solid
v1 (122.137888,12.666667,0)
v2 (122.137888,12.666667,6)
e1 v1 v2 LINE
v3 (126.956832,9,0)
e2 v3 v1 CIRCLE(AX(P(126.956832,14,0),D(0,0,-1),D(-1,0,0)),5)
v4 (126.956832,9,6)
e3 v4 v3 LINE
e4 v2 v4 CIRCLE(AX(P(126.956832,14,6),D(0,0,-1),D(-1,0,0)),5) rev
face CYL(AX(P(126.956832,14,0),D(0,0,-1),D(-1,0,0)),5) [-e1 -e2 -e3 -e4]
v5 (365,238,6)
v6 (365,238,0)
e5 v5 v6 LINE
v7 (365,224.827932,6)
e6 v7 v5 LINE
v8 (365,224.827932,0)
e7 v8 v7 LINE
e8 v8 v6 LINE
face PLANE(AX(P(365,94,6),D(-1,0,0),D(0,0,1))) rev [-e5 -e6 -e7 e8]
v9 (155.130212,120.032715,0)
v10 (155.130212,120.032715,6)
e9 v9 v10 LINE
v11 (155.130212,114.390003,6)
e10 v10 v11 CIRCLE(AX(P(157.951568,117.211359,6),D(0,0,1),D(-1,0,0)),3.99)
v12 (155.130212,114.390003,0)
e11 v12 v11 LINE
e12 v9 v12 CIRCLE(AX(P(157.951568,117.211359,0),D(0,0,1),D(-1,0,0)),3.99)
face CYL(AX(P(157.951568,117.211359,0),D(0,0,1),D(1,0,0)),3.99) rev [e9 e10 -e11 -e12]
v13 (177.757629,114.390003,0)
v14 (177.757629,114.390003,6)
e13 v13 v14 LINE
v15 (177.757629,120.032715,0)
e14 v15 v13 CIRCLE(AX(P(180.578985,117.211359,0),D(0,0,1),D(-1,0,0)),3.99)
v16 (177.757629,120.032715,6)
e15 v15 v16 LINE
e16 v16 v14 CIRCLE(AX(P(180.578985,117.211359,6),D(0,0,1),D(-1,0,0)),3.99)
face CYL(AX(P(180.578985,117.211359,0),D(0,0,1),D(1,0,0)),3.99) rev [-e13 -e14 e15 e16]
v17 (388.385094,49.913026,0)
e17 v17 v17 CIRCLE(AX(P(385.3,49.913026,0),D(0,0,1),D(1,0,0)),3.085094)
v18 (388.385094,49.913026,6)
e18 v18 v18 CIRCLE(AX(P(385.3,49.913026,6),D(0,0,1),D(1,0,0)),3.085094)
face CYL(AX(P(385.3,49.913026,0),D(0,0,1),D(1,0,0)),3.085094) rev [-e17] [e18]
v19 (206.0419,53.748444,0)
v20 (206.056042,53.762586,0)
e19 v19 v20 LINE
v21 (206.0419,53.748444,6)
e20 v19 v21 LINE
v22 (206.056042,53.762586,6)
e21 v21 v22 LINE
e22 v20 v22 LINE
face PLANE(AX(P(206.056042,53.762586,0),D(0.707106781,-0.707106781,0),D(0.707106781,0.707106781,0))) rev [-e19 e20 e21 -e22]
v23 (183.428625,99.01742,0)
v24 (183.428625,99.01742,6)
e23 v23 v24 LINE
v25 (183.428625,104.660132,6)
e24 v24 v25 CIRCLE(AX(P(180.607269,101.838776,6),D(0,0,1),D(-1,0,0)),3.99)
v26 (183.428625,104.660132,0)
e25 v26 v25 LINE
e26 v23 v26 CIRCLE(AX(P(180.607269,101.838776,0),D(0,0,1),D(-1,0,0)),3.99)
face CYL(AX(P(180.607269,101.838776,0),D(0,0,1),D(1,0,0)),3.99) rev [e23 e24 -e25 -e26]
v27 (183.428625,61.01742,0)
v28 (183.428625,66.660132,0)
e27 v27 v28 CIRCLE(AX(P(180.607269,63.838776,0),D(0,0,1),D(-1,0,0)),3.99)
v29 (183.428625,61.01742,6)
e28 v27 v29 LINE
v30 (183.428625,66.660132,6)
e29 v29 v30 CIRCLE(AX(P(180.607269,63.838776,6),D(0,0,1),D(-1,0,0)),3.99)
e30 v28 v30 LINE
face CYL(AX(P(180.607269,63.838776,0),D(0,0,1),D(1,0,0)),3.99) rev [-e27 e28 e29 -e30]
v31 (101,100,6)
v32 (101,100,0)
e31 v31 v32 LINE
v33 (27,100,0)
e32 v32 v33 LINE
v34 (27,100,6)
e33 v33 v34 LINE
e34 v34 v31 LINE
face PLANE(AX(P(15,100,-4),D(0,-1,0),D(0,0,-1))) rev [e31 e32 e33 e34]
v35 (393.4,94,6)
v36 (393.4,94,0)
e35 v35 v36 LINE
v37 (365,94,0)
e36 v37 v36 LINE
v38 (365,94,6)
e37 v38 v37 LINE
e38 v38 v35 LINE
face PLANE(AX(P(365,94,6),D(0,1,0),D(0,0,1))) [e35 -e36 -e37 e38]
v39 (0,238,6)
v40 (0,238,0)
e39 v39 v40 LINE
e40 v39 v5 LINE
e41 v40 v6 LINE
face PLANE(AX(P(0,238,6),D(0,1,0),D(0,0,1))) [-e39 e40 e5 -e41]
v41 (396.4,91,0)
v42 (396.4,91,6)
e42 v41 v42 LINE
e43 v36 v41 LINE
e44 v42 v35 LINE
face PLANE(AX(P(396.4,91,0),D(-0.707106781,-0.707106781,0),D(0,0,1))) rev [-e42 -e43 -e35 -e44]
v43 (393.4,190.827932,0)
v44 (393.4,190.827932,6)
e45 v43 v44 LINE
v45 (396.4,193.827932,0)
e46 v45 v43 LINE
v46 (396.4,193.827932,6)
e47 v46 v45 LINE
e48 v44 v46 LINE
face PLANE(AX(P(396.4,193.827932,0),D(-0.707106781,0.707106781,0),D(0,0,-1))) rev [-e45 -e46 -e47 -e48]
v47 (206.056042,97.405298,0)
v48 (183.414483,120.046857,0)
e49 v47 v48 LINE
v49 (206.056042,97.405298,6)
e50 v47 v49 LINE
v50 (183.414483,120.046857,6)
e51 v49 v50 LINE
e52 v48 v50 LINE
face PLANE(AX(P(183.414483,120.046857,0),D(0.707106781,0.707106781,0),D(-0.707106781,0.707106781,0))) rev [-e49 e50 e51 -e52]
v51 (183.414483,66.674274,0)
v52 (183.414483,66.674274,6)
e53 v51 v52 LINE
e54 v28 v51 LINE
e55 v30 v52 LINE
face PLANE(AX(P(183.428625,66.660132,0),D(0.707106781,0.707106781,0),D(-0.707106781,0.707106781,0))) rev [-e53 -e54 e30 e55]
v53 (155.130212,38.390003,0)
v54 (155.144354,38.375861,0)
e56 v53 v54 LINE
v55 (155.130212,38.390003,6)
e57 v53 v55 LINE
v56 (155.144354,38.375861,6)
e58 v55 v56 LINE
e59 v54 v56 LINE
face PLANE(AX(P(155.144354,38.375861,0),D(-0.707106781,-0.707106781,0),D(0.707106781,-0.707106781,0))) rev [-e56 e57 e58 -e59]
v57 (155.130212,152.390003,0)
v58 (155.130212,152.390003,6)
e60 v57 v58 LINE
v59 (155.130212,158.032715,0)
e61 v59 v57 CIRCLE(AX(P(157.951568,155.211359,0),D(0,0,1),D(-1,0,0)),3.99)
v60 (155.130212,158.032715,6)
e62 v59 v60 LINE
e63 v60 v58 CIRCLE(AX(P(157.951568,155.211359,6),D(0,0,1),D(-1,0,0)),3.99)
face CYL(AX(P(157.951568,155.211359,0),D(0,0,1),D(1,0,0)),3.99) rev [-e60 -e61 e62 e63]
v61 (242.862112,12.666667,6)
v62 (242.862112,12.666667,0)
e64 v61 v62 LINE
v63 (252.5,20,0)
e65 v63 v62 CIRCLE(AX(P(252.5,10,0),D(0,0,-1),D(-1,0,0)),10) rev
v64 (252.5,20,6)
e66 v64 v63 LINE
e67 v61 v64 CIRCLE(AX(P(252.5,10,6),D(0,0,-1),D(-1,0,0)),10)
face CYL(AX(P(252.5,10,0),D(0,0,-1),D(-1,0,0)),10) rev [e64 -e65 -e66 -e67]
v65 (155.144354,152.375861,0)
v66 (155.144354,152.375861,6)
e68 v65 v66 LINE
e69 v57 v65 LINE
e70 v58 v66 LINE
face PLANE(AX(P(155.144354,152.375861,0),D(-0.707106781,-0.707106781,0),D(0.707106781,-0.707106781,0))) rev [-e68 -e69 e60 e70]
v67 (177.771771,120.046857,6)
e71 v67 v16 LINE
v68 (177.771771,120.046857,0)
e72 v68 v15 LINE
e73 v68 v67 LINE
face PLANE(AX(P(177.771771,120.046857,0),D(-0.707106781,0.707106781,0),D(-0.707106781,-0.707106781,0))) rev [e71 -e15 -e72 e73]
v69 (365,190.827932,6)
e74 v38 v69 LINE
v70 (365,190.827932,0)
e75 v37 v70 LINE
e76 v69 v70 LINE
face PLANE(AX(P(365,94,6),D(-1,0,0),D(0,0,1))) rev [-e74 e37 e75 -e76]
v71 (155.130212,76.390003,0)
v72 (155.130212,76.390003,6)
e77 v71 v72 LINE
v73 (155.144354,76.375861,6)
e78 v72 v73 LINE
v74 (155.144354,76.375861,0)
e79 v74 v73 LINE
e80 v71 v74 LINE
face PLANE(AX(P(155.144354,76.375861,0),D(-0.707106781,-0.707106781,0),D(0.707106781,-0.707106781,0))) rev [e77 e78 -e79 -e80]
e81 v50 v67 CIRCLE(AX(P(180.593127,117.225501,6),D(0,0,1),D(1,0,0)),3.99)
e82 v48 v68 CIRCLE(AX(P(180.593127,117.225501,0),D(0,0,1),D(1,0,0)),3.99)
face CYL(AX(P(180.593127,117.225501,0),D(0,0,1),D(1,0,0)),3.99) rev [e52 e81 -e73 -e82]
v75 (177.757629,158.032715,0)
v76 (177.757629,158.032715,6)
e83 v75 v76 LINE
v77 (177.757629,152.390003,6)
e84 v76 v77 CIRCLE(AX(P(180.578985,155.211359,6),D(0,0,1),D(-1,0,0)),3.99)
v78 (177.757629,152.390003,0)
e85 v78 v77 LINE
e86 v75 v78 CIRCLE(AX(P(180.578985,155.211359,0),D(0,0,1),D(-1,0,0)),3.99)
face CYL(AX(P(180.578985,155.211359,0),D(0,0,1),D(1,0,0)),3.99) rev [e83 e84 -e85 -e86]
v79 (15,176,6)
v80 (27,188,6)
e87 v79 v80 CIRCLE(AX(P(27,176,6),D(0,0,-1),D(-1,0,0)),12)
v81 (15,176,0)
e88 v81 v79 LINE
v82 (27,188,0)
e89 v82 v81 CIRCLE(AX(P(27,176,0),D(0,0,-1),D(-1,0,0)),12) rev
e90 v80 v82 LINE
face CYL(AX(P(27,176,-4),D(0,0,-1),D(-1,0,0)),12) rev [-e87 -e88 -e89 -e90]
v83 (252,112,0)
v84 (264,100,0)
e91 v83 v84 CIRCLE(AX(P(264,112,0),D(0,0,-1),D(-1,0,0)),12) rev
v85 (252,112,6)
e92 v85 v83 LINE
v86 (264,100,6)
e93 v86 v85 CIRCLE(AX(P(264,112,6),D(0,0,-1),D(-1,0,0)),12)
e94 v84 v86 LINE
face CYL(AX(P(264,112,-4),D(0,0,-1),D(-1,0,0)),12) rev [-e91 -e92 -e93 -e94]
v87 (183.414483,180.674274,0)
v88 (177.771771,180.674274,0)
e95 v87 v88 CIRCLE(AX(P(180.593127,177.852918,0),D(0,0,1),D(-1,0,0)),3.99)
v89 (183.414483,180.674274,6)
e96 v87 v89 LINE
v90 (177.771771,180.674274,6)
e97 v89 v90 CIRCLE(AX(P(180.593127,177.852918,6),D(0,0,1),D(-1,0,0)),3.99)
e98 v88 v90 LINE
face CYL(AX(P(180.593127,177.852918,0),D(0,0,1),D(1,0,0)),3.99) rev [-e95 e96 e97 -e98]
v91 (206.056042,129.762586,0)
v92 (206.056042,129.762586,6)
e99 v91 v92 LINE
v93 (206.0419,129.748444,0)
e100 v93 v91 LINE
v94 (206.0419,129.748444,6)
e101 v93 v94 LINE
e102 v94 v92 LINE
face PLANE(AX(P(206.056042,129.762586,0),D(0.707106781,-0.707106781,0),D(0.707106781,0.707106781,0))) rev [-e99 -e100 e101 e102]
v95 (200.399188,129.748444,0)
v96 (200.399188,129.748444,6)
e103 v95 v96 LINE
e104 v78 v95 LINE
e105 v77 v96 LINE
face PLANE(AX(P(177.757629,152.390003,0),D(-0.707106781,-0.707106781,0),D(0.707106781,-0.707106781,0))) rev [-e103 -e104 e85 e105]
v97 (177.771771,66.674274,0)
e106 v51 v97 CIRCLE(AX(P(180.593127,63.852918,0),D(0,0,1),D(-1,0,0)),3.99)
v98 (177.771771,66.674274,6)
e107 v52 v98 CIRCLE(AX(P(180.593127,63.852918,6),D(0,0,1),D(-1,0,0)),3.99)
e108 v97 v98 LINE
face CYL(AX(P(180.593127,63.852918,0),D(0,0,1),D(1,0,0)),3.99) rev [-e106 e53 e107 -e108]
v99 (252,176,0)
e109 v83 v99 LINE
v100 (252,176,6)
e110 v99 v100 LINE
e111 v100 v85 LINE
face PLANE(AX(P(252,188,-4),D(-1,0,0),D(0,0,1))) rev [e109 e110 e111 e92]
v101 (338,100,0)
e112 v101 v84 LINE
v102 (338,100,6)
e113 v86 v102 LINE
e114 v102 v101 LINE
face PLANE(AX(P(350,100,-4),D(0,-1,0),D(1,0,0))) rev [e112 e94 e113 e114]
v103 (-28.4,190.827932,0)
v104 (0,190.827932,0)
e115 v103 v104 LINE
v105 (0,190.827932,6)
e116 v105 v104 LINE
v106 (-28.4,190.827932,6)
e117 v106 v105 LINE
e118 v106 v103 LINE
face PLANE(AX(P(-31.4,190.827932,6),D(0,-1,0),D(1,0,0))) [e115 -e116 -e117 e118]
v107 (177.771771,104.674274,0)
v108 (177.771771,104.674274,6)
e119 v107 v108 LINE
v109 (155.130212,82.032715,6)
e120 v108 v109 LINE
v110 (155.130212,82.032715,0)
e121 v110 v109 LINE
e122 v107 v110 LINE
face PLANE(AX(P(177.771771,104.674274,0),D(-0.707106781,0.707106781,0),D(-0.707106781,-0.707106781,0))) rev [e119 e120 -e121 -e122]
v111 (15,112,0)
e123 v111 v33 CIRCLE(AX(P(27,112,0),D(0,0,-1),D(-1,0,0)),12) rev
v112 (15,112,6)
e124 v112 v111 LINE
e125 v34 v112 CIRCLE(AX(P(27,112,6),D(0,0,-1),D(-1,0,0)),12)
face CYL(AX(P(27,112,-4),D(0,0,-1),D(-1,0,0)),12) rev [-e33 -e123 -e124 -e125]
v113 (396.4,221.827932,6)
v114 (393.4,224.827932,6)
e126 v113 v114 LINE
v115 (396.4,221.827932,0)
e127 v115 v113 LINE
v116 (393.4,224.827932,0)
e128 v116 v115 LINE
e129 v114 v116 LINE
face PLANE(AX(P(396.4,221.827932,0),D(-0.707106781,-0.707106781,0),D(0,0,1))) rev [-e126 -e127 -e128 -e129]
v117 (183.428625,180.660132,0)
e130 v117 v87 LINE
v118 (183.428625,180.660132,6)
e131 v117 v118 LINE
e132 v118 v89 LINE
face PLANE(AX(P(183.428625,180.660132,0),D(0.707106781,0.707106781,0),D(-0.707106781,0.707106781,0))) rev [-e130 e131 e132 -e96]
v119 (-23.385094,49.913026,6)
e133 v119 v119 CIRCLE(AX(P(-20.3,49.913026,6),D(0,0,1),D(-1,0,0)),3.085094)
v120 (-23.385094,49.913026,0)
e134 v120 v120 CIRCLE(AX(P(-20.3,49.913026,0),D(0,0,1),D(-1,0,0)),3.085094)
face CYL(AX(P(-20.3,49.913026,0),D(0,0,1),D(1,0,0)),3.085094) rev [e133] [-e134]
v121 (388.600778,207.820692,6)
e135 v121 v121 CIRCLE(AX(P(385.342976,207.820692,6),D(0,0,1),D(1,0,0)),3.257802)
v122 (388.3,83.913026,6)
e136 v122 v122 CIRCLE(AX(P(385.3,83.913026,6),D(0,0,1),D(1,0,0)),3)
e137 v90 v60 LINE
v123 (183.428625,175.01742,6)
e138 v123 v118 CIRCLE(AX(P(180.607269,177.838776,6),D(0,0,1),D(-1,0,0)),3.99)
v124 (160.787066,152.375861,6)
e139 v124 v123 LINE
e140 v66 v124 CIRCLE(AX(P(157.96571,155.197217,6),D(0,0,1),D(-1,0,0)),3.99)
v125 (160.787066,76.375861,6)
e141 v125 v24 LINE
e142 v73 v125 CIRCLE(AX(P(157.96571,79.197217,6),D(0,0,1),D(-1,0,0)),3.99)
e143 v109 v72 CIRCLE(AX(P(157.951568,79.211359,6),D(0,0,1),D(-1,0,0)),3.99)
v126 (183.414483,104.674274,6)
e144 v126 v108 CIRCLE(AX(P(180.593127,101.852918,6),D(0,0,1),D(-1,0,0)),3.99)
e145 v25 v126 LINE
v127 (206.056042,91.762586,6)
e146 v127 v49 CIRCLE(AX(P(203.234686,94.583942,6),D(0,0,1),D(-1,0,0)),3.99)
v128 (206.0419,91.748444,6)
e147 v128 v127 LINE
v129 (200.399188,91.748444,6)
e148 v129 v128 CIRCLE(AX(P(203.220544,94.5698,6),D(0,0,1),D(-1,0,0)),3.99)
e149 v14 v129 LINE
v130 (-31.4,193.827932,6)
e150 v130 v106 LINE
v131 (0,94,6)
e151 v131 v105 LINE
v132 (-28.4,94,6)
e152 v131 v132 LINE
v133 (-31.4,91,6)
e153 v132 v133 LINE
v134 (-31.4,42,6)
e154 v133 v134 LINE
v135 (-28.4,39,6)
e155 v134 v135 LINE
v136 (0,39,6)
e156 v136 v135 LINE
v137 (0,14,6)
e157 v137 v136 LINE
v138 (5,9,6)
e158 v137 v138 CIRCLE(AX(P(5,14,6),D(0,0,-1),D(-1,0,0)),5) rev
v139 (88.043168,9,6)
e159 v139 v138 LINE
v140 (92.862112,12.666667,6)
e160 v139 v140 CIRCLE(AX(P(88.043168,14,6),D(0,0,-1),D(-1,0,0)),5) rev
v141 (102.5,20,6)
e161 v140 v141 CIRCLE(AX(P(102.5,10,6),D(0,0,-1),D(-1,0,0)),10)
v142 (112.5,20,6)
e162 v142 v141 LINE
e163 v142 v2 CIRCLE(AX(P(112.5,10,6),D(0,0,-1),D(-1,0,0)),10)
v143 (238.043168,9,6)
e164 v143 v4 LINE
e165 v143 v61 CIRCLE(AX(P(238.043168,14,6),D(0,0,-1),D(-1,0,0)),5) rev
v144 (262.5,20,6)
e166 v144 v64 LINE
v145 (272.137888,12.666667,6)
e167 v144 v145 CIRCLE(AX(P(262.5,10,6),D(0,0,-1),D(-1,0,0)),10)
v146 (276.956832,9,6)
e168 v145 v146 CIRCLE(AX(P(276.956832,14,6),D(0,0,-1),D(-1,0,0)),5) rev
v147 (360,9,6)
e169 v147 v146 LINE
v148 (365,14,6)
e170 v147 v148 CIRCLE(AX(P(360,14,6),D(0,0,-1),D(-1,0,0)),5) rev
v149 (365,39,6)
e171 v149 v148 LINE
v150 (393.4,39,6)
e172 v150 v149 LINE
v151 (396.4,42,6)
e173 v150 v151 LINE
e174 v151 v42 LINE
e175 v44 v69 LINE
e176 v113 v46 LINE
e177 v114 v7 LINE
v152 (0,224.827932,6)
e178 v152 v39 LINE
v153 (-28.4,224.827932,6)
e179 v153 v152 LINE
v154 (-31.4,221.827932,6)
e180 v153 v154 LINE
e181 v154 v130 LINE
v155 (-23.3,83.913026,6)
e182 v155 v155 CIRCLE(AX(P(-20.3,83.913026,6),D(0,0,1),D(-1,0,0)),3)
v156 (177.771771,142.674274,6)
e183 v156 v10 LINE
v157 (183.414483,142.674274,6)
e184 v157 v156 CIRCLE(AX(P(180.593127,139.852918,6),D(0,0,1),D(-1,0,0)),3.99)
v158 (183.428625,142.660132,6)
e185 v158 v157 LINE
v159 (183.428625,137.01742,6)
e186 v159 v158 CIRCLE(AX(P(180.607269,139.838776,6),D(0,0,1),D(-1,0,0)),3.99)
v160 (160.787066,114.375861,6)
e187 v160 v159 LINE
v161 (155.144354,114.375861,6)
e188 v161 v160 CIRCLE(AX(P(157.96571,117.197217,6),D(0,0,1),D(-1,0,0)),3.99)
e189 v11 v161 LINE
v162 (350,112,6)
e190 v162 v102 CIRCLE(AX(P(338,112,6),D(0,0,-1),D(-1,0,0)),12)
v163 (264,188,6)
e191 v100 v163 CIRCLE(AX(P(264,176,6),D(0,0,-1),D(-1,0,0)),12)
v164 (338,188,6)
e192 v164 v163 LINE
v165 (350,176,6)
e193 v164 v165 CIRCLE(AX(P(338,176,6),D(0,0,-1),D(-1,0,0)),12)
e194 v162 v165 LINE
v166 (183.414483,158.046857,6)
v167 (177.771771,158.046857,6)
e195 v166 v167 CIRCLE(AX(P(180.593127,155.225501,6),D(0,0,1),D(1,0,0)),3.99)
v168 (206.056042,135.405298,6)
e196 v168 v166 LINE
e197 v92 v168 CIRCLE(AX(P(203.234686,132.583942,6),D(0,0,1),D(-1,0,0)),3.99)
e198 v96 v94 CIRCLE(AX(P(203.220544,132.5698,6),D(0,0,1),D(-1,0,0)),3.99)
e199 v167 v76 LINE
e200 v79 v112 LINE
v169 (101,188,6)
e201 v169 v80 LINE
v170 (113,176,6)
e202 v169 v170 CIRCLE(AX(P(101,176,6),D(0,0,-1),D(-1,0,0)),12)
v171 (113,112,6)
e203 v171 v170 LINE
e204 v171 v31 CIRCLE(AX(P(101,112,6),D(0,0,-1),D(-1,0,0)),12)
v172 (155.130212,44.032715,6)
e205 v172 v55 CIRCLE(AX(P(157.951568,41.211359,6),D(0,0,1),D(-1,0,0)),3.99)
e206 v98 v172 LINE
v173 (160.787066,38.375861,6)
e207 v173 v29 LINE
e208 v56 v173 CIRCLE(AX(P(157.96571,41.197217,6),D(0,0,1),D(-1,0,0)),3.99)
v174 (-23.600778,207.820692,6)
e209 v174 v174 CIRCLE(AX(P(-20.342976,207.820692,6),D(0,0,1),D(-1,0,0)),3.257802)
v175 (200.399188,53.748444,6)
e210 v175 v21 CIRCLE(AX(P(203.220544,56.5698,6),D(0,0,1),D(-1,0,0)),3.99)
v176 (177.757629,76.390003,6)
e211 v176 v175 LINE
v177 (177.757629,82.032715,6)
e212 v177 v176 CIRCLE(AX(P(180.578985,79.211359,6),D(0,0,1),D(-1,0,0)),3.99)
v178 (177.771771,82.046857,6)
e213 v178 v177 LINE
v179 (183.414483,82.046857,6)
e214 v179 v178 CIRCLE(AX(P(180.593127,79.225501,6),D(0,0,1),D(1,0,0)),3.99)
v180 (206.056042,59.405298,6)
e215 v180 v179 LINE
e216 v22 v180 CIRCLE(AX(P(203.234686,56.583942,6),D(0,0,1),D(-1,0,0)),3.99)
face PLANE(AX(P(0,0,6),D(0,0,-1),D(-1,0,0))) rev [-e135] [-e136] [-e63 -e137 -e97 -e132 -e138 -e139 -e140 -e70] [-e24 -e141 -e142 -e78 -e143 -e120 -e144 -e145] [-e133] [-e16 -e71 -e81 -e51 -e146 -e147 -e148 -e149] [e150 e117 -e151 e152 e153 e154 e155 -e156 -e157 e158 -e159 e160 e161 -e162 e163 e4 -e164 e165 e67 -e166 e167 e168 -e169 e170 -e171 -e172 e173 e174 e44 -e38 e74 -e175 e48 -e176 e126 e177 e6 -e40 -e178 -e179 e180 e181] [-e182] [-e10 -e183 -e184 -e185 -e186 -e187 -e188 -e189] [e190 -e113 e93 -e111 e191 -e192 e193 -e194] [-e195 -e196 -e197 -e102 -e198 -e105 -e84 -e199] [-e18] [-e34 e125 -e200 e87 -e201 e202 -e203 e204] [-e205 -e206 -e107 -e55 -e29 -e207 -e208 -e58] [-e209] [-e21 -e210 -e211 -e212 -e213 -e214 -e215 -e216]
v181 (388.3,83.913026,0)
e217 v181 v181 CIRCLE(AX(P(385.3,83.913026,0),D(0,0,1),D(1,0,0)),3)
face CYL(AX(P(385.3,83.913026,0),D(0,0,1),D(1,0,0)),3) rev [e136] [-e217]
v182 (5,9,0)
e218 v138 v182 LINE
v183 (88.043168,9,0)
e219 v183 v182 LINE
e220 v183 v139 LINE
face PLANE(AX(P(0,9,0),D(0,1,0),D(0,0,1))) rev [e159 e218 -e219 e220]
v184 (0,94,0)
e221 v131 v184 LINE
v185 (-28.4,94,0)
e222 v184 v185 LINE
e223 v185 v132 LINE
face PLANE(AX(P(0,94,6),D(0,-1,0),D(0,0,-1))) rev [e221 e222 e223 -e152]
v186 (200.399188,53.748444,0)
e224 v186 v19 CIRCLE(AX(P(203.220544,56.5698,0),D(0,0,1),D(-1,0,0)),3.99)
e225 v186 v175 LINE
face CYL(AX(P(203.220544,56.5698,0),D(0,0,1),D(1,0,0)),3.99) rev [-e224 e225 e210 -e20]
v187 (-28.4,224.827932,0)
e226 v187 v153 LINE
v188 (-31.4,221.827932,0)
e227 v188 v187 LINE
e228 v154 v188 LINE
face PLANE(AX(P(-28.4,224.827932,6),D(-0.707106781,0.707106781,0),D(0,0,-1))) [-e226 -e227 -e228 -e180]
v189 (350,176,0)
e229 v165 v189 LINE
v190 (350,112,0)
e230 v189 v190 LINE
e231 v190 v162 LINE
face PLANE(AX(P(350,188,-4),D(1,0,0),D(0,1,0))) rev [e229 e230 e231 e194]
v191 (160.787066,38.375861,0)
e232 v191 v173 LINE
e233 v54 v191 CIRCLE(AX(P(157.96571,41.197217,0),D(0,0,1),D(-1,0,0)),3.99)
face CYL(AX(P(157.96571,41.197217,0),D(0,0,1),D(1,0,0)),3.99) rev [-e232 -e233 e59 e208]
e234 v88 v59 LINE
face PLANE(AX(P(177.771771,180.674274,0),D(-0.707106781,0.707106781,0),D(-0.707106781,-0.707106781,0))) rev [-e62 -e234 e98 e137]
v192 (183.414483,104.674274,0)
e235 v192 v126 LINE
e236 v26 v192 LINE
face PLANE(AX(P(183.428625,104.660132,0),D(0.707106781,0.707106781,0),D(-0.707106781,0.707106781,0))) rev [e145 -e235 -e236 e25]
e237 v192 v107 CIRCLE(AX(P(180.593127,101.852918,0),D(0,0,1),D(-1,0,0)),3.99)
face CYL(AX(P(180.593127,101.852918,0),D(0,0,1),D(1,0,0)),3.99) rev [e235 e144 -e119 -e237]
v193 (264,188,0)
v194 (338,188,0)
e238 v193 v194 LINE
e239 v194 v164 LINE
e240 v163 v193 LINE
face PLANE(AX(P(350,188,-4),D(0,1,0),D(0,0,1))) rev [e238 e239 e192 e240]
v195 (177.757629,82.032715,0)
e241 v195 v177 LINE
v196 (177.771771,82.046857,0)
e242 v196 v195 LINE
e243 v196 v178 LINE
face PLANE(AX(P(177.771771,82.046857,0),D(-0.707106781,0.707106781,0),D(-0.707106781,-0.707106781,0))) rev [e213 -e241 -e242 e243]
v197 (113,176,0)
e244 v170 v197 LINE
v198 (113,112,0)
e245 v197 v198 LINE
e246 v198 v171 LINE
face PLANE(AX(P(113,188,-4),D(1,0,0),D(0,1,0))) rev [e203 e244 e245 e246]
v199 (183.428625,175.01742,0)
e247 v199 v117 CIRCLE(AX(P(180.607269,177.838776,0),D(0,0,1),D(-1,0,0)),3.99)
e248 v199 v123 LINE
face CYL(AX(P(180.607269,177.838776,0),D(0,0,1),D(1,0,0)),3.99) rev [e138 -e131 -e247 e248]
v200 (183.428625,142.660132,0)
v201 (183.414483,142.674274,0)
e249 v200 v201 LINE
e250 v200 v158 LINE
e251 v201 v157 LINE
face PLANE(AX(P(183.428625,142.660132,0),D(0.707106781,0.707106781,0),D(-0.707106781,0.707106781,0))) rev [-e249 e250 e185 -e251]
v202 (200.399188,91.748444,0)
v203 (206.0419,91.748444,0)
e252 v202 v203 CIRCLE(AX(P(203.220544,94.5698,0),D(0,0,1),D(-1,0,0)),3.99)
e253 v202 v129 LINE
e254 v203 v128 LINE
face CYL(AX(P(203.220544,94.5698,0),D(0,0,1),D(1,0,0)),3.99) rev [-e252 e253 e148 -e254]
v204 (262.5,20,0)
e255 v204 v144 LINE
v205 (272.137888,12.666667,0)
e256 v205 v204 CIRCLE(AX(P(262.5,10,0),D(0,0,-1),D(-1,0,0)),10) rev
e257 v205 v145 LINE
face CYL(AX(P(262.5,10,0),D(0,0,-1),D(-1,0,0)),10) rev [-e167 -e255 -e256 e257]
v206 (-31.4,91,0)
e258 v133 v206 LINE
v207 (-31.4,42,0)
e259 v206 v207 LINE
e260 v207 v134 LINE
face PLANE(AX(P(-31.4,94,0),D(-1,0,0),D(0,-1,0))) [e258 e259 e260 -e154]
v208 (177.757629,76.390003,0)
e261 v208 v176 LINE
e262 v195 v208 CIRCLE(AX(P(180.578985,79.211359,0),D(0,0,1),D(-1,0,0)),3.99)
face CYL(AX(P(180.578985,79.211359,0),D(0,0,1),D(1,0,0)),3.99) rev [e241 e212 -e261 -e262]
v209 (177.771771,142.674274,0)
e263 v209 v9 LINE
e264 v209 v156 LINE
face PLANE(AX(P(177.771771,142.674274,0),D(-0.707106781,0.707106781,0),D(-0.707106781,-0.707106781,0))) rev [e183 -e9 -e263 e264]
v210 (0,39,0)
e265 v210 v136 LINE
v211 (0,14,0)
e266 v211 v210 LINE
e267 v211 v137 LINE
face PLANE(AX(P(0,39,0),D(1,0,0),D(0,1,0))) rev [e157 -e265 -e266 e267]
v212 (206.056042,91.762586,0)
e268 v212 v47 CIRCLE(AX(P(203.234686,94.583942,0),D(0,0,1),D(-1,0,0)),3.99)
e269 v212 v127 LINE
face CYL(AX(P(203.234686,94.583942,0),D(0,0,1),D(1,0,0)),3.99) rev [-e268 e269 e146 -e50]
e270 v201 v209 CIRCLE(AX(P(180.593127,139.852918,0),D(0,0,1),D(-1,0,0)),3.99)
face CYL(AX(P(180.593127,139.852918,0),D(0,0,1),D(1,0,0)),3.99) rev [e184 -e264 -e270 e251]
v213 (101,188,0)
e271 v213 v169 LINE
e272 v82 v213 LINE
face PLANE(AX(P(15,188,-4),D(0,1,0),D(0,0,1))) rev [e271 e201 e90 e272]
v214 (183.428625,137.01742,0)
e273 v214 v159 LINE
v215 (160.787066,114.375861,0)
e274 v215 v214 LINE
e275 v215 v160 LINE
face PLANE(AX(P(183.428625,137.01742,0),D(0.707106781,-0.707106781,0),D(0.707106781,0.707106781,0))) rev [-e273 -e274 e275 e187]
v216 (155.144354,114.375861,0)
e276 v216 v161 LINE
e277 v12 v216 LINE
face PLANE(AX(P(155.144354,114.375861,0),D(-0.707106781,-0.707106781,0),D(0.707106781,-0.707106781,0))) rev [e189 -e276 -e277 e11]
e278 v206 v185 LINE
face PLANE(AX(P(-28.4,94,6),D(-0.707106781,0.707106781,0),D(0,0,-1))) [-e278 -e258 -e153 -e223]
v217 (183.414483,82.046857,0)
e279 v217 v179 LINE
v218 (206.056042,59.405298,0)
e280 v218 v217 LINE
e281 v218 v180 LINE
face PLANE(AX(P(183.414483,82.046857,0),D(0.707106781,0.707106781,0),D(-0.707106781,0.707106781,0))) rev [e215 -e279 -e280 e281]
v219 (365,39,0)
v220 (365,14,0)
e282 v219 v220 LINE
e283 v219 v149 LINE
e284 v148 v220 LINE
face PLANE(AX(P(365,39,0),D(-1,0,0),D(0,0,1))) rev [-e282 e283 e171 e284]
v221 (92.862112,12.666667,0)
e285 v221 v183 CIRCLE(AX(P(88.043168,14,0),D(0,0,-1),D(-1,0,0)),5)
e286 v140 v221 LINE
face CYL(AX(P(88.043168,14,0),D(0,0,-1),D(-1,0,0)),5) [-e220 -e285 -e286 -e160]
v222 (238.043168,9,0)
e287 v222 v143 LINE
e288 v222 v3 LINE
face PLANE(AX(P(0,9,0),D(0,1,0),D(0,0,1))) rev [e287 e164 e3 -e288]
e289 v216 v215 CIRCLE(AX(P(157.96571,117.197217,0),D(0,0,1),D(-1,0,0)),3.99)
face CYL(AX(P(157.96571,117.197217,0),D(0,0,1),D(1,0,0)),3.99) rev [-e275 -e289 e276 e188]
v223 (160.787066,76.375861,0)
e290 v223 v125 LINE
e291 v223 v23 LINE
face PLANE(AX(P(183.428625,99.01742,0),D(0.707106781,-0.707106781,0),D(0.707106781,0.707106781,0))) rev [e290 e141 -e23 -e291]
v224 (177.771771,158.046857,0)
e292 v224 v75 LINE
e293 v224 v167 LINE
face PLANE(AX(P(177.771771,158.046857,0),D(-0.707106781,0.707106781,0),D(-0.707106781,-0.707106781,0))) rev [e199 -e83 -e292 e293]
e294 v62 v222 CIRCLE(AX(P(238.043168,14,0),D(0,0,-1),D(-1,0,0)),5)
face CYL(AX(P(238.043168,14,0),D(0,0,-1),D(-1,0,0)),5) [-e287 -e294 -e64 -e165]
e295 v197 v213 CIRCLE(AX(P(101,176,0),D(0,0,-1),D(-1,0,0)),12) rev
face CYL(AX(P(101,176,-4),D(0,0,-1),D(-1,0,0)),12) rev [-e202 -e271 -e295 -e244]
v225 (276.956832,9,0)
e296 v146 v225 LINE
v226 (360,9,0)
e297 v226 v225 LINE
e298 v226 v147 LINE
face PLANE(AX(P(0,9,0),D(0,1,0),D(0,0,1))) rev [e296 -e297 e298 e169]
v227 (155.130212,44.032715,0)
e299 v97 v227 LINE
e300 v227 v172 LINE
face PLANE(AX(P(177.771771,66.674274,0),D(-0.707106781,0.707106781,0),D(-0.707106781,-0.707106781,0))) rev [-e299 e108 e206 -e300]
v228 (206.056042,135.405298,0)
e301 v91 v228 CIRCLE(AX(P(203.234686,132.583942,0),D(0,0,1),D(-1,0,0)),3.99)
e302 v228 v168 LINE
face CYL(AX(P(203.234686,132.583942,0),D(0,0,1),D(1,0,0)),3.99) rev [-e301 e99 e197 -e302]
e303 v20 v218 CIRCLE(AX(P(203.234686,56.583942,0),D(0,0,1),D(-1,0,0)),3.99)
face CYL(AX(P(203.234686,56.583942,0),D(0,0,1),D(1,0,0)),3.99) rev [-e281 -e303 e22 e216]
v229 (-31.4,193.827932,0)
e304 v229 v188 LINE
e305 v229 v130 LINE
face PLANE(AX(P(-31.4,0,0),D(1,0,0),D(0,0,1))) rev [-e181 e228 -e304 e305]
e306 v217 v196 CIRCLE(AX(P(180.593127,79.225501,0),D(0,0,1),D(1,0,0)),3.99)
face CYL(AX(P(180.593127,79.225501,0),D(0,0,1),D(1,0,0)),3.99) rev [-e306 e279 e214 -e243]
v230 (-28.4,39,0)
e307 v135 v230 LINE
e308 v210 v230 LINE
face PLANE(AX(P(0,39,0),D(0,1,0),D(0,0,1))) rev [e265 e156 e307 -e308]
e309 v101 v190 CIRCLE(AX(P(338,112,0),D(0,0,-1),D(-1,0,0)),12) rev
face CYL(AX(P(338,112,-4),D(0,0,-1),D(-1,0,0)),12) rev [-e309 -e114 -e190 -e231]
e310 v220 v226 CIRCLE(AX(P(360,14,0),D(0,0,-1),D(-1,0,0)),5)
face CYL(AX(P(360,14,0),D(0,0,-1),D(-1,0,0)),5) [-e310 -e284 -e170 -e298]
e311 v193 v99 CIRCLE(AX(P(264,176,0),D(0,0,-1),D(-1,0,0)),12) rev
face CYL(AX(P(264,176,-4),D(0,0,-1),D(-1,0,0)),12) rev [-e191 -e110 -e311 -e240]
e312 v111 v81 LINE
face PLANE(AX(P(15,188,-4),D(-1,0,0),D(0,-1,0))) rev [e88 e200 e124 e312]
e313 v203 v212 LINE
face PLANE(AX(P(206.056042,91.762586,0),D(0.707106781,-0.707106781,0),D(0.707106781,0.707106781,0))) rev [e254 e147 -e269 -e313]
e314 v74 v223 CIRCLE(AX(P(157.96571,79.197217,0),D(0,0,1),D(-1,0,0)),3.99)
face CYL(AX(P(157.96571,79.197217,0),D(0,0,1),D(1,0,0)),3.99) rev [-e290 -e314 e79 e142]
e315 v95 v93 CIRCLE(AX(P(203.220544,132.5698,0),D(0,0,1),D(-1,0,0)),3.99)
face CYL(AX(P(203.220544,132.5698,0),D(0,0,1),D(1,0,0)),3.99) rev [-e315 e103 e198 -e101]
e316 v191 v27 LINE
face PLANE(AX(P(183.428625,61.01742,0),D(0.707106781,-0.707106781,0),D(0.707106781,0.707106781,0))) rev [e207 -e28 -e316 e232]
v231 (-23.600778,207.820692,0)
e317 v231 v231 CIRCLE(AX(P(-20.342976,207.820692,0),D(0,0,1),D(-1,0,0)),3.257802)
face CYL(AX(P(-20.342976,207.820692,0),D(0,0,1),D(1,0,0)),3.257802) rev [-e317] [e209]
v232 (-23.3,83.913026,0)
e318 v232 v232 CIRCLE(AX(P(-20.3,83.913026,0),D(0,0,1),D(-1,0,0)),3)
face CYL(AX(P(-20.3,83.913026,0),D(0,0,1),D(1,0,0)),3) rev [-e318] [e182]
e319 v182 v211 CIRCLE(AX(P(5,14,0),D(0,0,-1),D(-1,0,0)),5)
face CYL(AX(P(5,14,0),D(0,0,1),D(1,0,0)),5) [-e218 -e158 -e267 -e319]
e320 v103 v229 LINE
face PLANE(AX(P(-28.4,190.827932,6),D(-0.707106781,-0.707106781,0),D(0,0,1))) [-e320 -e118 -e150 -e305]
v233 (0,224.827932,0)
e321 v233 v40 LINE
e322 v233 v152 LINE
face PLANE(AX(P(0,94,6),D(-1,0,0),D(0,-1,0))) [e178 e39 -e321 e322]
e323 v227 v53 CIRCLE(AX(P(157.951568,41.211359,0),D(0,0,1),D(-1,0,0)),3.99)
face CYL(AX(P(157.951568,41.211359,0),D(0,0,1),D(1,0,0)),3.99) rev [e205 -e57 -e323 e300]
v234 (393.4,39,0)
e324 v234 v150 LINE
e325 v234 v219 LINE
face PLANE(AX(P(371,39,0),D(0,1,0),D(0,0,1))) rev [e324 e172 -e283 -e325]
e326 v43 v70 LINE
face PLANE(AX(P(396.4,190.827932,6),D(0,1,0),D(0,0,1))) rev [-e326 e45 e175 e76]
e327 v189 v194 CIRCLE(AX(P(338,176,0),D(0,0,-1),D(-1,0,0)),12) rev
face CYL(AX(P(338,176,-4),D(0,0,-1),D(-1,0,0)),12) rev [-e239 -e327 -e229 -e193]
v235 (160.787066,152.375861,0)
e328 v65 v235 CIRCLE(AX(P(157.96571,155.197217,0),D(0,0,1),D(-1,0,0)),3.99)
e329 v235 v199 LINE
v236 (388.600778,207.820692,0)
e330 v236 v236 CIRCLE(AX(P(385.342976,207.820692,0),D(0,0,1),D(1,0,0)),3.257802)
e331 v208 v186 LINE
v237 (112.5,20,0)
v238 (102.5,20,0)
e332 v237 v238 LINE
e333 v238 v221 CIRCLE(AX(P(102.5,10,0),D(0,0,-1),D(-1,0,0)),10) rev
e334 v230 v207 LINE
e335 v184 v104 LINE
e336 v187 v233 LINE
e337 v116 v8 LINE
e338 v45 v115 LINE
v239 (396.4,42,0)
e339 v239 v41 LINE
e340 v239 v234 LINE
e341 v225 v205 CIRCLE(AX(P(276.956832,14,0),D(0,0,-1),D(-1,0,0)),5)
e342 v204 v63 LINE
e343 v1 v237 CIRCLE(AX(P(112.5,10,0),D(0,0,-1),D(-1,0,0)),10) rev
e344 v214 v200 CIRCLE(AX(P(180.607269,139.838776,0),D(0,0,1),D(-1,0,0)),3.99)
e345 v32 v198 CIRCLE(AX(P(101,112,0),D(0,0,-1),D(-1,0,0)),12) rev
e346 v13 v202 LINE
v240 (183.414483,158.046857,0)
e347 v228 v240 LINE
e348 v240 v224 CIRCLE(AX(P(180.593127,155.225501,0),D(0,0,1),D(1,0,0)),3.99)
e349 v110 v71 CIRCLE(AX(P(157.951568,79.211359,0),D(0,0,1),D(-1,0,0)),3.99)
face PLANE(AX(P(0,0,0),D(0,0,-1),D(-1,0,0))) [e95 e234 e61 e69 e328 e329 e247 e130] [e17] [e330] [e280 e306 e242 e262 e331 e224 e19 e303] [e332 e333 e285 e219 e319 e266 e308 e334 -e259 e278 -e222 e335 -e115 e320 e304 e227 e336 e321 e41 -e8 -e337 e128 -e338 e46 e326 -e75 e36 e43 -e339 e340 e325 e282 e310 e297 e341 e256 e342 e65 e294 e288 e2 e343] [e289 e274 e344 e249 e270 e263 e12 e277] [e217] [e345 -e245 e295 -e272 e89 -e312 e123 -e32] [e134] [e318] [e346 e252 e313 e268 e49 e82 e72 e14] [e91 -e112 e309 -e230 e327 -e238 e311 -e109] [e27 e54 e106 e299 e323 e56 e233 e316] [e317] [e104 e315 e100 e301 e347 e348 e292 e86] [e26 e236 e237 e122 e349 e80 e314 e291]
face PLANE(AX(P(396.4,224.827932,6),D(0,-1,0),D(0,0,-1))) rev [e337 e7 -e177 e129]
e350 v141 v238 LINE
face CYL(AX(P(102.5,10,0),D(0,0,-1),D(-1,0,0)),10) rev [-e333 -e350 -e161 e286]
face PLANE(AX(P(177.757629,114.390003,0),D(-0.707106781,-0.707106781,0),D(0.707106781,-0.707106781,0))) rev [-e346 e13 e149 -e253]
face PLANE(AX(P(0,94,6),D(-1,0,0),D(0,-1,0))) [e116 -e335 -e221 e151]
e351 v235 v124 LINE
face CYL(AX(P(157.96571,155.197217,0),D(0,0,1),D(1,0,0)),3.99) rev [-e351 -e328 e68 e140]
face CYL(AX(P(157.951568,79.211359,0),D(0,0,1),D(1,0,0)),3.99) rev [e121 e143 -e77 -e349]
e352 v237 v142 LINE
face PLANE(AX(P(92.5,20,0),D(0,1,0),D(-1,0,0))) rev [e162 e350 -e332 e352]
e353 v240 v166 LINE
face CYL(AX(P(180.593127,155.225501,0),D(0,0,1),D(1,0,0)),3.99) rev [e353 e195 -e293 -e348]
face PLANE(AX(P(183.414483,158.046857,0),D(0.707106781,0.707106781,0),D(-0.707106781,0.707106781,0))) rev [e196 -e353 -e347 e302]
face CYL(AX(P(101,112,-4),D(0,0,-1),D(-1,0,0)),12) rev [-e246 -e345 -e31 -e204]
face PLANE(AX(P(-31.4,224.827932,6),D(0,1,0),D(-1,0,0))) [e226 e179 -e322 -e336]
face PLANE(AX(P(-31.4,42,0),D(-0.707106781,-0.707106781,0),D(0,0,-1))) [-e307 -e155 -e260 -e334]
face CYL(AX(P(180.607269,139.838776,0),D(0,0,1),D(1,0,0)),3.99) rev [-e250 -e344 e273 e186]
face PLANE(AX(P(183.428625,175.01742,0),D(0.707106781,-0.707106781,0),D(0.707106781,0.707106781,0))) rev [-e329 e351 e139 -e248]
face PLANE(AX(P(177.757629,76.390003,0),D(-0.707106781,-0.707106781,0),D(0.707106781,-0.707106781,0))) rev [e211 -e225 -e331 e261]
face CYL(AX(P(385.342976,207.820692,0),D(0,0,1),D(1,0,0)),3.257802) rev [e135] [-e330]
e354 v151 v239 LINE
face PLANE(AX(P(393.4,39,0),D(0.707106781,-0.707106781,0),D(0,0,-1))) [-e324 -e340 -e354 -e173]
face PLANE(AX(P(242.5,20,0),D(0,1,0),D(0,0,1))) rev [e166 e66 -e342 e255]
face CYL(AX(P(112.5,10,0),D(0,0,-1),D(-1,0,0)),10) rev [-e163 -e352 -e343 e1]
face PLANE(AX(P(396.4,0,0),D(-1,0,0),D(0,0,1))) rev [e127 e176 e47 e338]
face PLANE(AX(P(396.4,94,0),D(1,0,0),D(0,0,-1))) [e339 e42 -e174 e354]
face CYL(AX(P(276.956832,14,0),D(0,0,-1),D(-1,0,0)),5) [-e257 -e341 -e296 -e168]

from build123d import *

# Parameters (mm, degrees)
RESSALTO_EXTRUS_O1_DEPTH = 6
ESBO_O7_W                = 6
ESBO_O7_H                = 39
CORTE_EXTRUS_O5_DEPTH    = 441.818556778
ESBO_O2_W                = 98
ESBO_O2_H                = 88
CORTE_EXTRUS_O1_DEPTH    = 10
FILETE2_R                = 12
CORTE_EXTRUS_O3_DEPTH    = 441.818556778
ESBO_O6_W                = 30
ESBO_O6_H                = 20
CORTE_EXTRUS_O4_DEPTH    = 441.818556778
FILETE3_START            = -1
FILETE3_DEPTH            = 8
FILETE3_2_DEPTH          = 6
ESBO_O8_W                = 6
ESBO_O8_H                = 34
RESSALTO_EXTRUS_O2_DEPTH = 31.4
ESBO_O9_W                = 25.4
ESBO_O9_H                = 55
RESSALTO_EXTRUS_O3_DEPTH = 6
CHANFRO1_SIZE            = 3
ESBO_O10_R               = 3.257801974
ESBO_O10_R_2             = 3
ESBO_O10_R_3             = 3.08509383
CORTE_EXTRUS_O6_DEPTH    = 463.399134947
FILETE4_R                = 5
ESBO_O11_W               = 402.172610053
ESBO_O11_H               = 13.658923547
CORTE_EXTRUS_O7_DEPTH    = 463.399134947
FILETE5_R                = 5


with BuildPart() as part:
    # Esboço1 → Ressalto-extrusão1 (new body)
    with BuildSketch(Plane.XY):
        Polygon((0, 94), (0, 238), (365, 238), (365, 94), (371, 94), (371, 0), (365, 0), (0, 0), (-6, 0), (-6, 94), align=None)
    extrude(amount=RESSALTO_EXTRUS_O1_DEPTH)

    # Esboço7 → Corte-extrusão5 (cut, through all)
    with BuildSketch(Plane.XY.offset(6)):
        with Locations((368, 19.5)):
            Rectangle(ESBO_O7_W, ESBO_O7_H)
        with Locations((-3, 19.5)):
            Rectangle(ESBO_O7_W, ESBO_O7_H)
    extrude(amount=-CORTE_EXTRUS_O5_DEPTH, mode=Mode.SUBTRACT)

    # Esboço2 → Corte-extrusão1 (cut)
    with BuildSketch(Plane.XY.offset(6)):
        with Locations((64, 144)):
            Rectangle(ESBO_O2_W, ESBO_O2_H)
        with Locations((301, 144)):
            Rectangle(ESBO_O2_W, ESBO_O2_H)
    extrude(amount=-CORTE_EXTRUS_O1_DEPTH, mode=Mode.SUBTRACT)

    # Filete2
    filete2_edges = [part.edges().sort_by_distance(p)[0] for p in [
        (15, 100, 3),
        (15, 188, 3),
        (113, 188, 3),
        (113, 100, 3),
        (350, 188, 3),
        (350, 100, 3),
        (252, 100, 3),
        (252, 188, 3),
    ]]
    fillet(filete2_edges, radius=FILETE2_R)

    # Esboço5 → Corte-extrusão3 (cut, through all)
    with BuildSketch(Plane.XY.offset(6)):
        with BuildLine():
            Line((183.428625358, 61.017420231), (160.787066224, 38.375861098))
            ThreePointArc((160.787066224, 38.375861098), (157.965710167, 37.207217155), (155.14435411, 38.375861098))
            Line((155.14435411, 38.375861098), (155.130211974, 38.390003233))
            ThreePointArc((155.130211974, 38.390003233), (153.961568031, 41.21135929), (155.130211974, 44.032715347))
            Line((155.130211974, 44.032715347), (177.771771108, 66.674274481))
            ThreePointArc((177.771771108, 66.674274481), (180.593127165, 67.842918424), (183.414483222, 66.674274481))
            Line((183.414483222, 66.674274481), (183.428625358, 66.660132345))
            ThreePointArc((183.428625358, 66.660132345), (184.597269301, 63.838776288), (183.428625358, 61.017420231))
        make_face()
        with BuildLine():
            Line((177.771771108, 82.046857483), (177.757628972, 82.032715347))
            ThreePointArc((177.757628972, 82.032715347), (176.588985029, 79.21135929), (177.757628972, 76.390003233))
            Line((177.757628972, 76.390003233), (200.399188106, 53.7484441))
            ThreePointArc((200.399188106, 53.7484441), (203.220544163, 52.579800157), (206.04190022, 53.7484441))
            Line((206.04190022, 53.7484441), (206.056042356, 53.762586235))
            ThreePointArc((206.056042356, 53.762586235), (207.224686299, 56.583942292), (206.056042356, 59.405298349))
            Line((206.056042356, 59.405298349), (183.414483222, 82.046857483))
            ThreePointArc((183.414483222, 82.046857483), (180.593127165, 83.215501426), (177.771771108, 82.046857483))
        make_face()
        with BuildLine():
            Line((183.428625358, 99.017420231), (160.787066224, 76.375861098))
            ThreePointArc((160.787066224, 76.375861098), (157.965710167, 75.207217155), (155.14435411, 76.375861098))
            Line((155.14435411, 76.375861098), (155.130211974, 76.390003233))
            ThreePointArc((155.130211974, 76.390003233), (153.961568031, 79.21135929), (155.130211974, 82.032715347))
            Line((155.130211974, 82.032715347), (177.771771108, 104.674274481))
            ThreePointArc((177.771771108, 104.674274481), (180.593127165, 105.842918424), (183.414483222, 104.674274481))
            Line((183.414483222, 104.674274481), (183.428625358, 104.660132345))
            ThreePointArc((183.428625358, 104.660132345), (184.597269301, 101.838776288), (183.428625358, 99.017420231))
        make_face()
        with BuildLine():
            Line((177.771771108, 120.046857483), (177.757628972, 120.032715347))
            ThreePointArc((177.757628972, 120.032715347), (176.588985029, 117.21135929), (177.757628972, 114.390003233))
            Line((177.757628972, 114.390003233), (200.399188106, 91.7484441))
            ThreePointArc((200.399188106, 91.7484441), (203.220544163, 90.579800157), (206.04190022, 91.7484441))
            Line((206.04190022, 91.7484441), (206.056042356, 91.762586235))
            ThreePointArc((206.056042356, 91.762586235), (207.224686299, 94.583942292), (206.056042356, 97.405298349))
            Line((206.056042356, 97.405298349), (183.414483222, 120.046857483))
            ThreePointArc((183.414483222, 120.046857483), (180.593127165, 121.215501426), (177.771771108, 120.046857483))
        make_face()
        with BuildLine():
            Line((183.428625358, 137.017420231), (160.787066224, 114.375861098))
            ThreePointArc((160.787066224, 114.375861098), (157.965710167, 113.207217155), (155.14435411, 114.375861098))
            Line((155.14435411, 114.375861098), (155.130211974, 114.390003233))
            ThreePointArc((155.130211974, 114.390003233), (153.961568031, 117.21135929), (155.130211974, 120.032715347))
            Line((155.130211974, 120.032715347), (177.771771108, 142.674274481))
            ThreePointArc((177.771771108, 142.674274481), (180.593127165, 143.842918424), (183.414483222, 142.674274481))
            Line((183.414483222, 142.674274481), (183.428625358, 142.660132345))
            ThreePointArc((183.428625358, 142.660132345), (184.597269301, 139.838776288), (183.428625358, 137.017420231))
        make_face()
        with BuildLine():
            Line((177.771771108, 158.046857483), (177.757628972, 158.032715347))
            ThreePointArc((177.757628972, 158.032715347), (176.588985029, 155.21135929), (177.757628972, 152.390003233))
            Line((177.757628972, 152.390003233), (200.399188106, 129.7484441))
            ThreePointArc((200.399188106, 129.7484441), (203.220544163, 128.579800157), (206.04190022, 129.7484441))
            Line((206.04190022, 129.7484441), (206.056042356, 129.762586235))
            ThreePointArc((206.056042356, 129.762586235), (207.224686299, 132.583942292), (206.056042356, 135.405298349))
            Line((206.056042356, 135.405298349), (183.414483222, 158.046857483))
            ThreePointArc((183.414483222, 158.046857483), (180.593127165, 159.215501426), (177.771771108, 158.046857483))
        make_face()
        with BuildLine():
            Line((183.428625358, 175.017420231), (160.787066224, 152.375861098))
            ThreePointArc((160.787066224, 152.375861098), (157.965710167, 151.207217155), (155.14435411, 152.375861098))
            Line((155.14435411, 152.375861098), (155.130211974, 152.390003233))
            ThreePointArc((155.130211974, 152.390003233), (153.961568031, 155.21135929), (155.130211974, 158.032715347))
            Line((155.130211974, 158.032715347), (177.771771108, 180.674274481))
            ThreePointArc((177.771771108, 180.674274481), (180.593127165, 181.842918424), (183.414483222, 180.674274481))
            Line((183.414483222, 180.674274481), (183.428625358, 180.660132345))
            ThreePointArc((183.428625358, 180.660132345), (184.597269301, 177.838776288), (183.428625358, 175.017420231))
        make_face()
    extrude(amount=-CORTE_EXTRUS_O3_DEPTH, mode=Mode.SUBTRACT)

    # Esboço6 → Corte-extrusão4 (cut, through all)
    with BuildSketch(Plane.XY.offset(6)):
        with Locations((107.5, 10)):
            Rectangle(ESBO_O6_W, ESBO_O6_H)
        with Locations((257.5, 10)):
            Rectangle(ESBO_O6_W, ESBO_O6_H)
    extrude(amount=-CORTE_EXTRUS_O4_DEPTH, mode=Mode.SUBTRACT)

    # Filete3: read off the stored shape, not the designer's step
    # Filete3 outline → Filete3 (cut)
    with BuildSketch(Plane.XY.offset(FILETE3_START)):
        with BuildLine():
            ThreePointArc((282.5, 0), (275.428932188, 2.928932188), (272.5, 10))
            Line((272.5, 10), (272.5, 0))
            Line((272.5, 0), (282.5, 0))
        make_face()
        with BuildLine():
            Line((92.5, 0), (92.5, 10))
            ThreePointArc((92.5, 10), (89.571067812, 2.928932188), (82.5, 0))
            Line((82.5, 0), (92.5, 0))
        make_face()
        with BuildLine():
            Line((122.5, 0), (132.5, 0))
            ThreePointArc((132.5, 0), (125.428932188, 2.928932188), (122.5, 10))
            Line((122.5, 10), (122.5, 0))
        make_face()
        with BuildLine():
            Line((242.5, 0), (242.5, 10))
            ThreePointArc((242.5, 10), (239.571067812, 2.928932188), (232.5, 0))
            Line((232.5, 0), (242.5, 0))
        make_face()
    extrude(amount=FILETE3_DEPTH, mode=Mode.SUBTRACT)

    # Filete3 2 outline → Filete3 2 (add)
    with BuildSketch(Plane.XY):
        with BuildLine():
            Line((272.5, 20), (262.5, 20))
            ThreePointArc((262.5, 20), (269.571067812, 17.071067812), (272.5, 10))
            Line((272.5, 10), (272.5, 20))
        make_face()
        with BuildLine():
            ThreePointArc((92.5, 10), (95.428932188, 17.071067812), (102.5, 20))
            Line((102.5, 20), (92.5, 20))
            Line((92.5, 20), (92.5, 10))
        make_face()
        with BuildLine():
            ThreePointArc((112.5, 20), (119.571067812, 17.071067812), (122.5, 10))
            Line((122.5, 10), (122.5, 20))
            Line((122.5, 20), (112.5, 20))
        make_face()
        with BuildLine():
            ThreePointArc((242.5, 10), (245.428932188, 17.071067812), (252.5, 20))
            Line((252.5, 20), (242.5, 20))
            Line((242.5, 20), (242.5, 10))
        make_face()
    extrude(amount=FILETE3_2_DEPTH)

    # Esboço8 → Ressalto-extrusão2 (add)
    with BuildSketch(Plane(origin=(365, 0, 0), x_dir=(0, 0, -1), z_dir=(1, 0, 0))):
        with Locations((-3, 207.827931833)):
            Rectangle(ESBO_O8_W, ESBO_O8_H)
    ressalto_extrus_o2 = extrude(amount=RESSALTO_EXTRUS_O2_DEPTH)

    # Espelhar1: Ressalto-extrusão2 across plane
    add(ressalto_extrus_o2.mirror(Plane.ZY.offset(-182.5)))

    # Esboço9 → Ressalto-extrusão3 (add, through all)
    with BuildSketch(Plane.XY.offset(6)):
        with Locations((383.7, 66.5)):
            Rectangle(ESBO_O9_W, ESBO_O9_H)
        with Locations((-18.7, 66.5)):
            Rectangle(ESBO_O9_W, ESBO_O9_H)
    extrude(amount=-RESSALTO_EXTRUS_O3_DEPTH)

    # Chanfro1
    chanfro1_edges = [part.edges().sort_by_distance(p)[0] for p in [
        (396.4, 224.827931833, 3),
        (396.4, 190.827931833, 3),
        (-31.4, 224.827931833, 3),
        (-31.4, 190.827931833, 3),
        (396.4, 94, 3),
        (396.4, 39, 3),
        (-31.4, 39, 3),
        (-31.4, 94, 3),
    ]]
    chamfer(chanfro1_edges, length=CHANFRO1_SIZE)

    # Esboço10 → Corte-extrusão6 (cut, through all)
    with BuildSketch(Plane.XY.offset(6)):
        with Locations((385.342976088, 207.820691694)):
            Circle(ESBO_O10_R)
        with Locations((385.3, 83.913025663)):
            Circle(ESBO_O10_R_2)
        with Locations((385.3, 49.913025663)):
            Circle(ESBO_O10_R_3)
        with Locations(Location((-20.3, 49.913025663, 0), (0, 0, 180))):
            Circle(ESBO_O10_R_3)
        with Locations(Location((-20.3, 83.913025663, 0), (0, 0, 180))):
            Circle(ESBO_O10_R_2)
        with Locations(Location((-20.342976088, 207.820691694, 0), (0, 0, 180))):
            Circle(ESBO_O10_R)
    extrude(amount=-CORTE_EXTRUS_O6_DEPTH, mode=Mode.SUBTRACT)

    # Filete4
    filete4_edges = [part.edges().sort_by_distance(p)[0] for p in [
        (365, 0, 3),
        (0, 0, 3),
    ]]
    fillet(filete4_edges, radius=FILETE4_R)

    # Esboço11 → Corte-extrusão7 (cut, through all)
    with BuildSketch(Plane.XY.offset(6)):
        with Locations((201.086305027, 2.170538226)):
            Rectangle(ESBO_O11_W, ESBO_O11_H)
    extrude(amount=-CORTE_EXTRUS_O7_DEPTH, mode=Mode.SUBTRACT)

    # Filete5
    filete5_edges = [part.edges().sort_by_distance(p)[0] for p in [
        (0, 9, 3),
        (122.550125629, 9, 3),
        (92.449874371, 9, 3),
        (242.449874371, 9, 3),
        (272.550125629, 9, 3),
        (365, 9, 3),
    ]]
    fillet(filete5_edges, radius=FILETE5_R)


solid = part.part
